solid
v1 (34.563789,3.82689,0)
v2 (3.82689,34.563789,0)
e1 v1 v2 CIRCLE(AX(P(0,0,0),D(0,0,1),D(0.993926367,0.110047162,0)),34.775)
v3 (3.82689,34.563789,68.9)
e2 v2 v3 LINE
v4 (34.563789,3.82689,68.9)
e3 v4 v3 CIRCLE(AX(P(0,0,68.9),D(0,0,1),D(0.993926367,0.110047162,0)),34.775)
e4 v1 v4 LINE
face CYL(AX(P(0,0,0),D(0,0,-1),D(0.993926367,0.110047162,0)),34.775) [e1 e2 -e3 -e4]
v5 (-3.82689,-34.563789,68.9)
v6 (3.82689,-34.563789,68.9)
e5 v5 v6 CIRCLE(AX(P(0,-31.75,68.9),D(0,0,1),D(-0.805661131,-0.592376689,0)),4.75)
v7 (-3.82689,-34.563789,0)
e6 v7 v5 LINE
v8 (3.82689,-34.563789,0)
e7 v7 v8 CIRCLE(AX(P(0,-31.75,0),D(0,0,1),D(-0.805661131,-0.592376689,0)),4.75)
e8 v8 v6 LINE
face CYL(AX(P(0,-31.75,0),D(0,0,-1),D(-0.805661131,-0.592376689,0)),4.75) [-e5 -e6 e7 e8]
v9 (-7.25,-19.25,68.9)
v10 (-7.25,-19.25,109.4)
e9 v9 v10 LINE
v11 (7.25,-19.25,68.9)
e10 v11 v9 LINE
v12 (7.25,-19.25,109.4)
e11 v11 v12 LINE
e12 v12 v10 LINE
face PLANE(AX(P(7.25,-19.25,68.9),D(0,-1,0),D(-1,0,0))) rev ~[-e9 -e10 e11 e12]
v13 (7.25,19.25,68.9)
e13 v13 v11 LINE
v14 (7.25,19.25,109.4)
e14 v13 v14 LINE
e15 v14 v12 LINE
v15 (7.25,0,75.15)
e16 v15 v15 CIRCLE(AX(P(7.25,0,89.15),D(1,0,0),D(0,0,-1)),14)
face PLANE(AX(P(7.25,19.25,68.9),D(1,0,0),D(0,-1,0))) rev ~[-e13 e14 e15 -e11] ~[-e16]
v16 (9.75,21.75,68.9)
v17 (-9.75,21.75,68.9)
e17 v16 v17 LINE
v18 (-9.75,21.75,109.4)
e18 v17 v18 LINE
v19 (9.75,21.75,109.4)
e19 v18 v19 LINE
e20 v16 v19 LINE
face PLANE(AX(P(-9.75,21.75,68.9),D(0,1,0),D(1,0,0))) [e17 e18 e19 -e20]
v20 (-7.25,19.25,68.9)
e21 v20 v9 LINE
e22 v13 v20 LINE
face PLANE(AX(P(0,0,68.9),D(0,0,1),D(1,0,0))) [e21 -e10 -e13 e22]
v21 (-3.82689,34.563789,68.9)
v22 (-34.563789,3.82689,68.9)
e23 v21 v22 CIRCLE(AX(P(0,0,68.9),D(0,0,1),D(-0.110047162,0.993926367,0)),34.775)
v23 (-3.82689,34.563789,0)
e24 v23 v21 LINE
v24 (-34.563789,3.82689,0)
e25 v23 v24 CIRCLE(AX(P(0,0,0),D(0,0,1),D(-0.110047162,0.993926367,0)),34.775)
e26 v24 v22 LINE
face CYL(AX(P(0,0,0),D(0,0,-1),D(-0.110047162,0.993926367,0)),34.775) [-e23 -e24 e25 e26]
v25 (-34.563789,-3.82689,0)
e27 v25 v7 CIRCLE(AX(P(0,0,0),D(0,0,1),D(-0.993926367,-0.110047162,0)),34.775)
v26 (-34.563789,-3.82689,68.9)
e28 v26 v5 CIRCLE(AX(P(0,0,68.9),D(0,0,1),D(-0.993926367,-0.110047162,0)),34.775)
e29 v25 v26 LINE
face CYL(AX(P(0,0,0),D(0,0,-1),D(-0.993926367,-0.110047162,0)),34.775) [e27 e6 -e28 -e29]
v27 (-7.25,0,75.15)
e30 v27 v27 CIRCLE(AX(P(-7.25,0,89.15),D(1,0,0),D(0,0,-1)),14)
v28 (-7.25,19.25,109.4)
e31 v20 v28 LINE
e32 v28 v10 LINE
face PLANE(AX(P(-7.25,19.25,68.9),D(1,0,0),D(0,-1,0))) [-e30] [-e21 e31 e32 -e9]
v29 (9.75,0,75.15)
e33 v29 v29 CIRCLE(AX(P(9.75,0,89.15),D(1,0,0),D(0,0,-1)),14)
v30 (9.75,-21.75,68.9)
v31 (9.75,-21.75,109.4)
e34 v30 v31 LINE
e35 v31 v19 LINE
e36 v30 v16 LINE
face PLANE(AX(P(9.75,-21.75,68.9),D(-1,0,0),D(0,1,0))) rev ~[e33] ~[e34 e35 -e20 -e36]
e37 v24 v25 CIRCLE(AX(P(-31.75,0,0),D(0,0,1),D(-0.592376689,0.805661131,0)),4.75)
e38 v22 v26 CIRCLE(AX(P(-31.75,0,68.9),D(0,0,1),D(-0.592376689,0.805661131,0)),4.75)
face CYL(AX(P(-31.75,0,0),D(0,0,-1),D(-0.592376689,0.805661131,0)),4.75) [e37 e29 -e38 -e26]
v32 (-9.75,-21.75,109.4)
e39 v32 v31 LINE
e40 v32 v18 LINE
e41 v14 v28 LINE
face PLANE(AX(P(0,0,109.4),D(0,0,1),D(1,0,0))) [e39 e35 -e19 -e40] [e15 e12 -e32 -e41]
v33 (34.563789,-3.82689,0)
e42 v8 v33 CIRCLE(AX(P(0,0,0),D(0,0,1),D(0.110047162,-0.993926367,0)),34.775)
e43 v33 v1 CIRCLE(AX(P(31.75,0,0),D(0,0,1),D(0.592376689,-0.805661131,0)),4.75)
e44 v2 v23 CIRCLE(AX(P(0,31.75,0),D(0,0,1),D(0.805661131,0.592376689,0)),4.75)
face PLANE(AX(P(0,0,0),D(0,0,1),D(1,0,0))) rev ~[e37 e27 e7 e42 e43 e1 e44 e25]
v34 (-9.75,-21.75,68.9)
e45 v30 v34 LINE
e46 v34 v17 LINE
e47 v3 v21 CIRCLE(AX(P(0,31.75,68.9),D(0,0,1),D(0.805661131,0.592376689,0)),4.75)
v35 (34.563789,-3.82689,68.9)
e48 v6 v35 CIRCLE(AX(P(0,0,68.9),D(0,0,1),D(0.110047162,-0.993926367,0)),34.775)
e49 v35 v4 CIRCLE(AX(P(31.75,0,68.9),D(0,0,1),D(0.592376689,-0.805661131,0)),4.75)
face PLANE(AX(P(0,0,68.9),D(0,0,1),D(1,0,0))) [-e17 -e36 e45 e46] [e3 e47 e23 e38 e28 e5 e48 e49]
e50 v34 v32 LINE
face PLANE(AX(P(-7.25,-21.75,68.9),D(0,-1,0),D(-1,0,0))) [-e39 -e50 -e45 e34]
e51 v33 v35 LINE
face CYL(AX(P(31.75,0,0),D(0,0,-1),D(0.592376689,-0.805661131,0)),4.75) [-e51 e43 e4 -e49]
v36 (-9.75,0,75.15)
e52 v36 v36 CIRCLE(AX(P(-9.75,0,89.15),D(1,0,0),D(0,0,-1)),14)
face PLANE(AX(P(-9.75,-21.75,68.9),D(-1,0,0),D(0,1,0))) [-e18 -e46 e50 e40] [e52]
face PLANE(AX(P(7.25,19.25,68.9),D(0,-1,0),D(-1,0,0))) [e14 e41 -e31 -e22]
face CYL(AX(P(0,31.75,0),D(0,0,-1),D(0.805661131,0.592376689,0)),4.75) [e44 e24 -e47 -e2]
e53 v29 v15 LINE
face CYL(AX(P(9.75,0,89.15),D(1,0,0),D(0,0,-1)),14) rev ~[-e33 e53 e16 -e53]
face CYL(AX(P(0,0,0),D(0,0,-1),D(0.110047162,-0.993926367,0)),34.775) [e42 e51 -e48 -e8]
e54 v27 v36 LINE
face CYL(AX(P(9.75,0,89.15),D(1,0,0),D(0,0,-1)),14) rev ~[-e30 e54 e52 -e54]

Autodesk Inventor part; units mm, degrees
ref_plane "YZ Plane" through (0, 0, 0) normal (1, 0, 0) x (0, 1, 0)
ref_plane "XZ Plane" through (0, 0, 0) normal (0, 1, 0) x (-1, 0, 0)
ref_plane "XY Plane" through (0, 0, 0) normal (0, 0, 1) x (1, 0, 0)
sketch "Sketch1" plane through (0, 0, 0) normal (0, 0, 1) x (1, 0, 0)
  circle A0 centre (0, 0) radius 11.25
  circle A1 centre (0, 0) radius 35.025
  circle A2 centre (0, 0) radius 37.030393
  arc A3 (-32.79294, -17.200962) -> (-31.29294, -19.799038) centre (0, 0) ccw
  line L0 (-32.79294, -17.200962) -> (-31.05471, -16.197395)
  line L1 (-32.79294, -17.200962) -> (-31.05471, -16.197395)
  line L2 (-29.55471, -18.795471) -> (-31.29294, -19.799038)
  line L3 (-31.29294, -19.799038) -> (-29.55471, -18.795471)
  line L4 (-16.197395, -31.05471) -> (-17.200962, -32.79294)
  line L5 (-17.200962, -32.79294) -> (-16.197395, -31.05471)
  arc A4 (-19.799038, -31.29294) -> (-17.200962, -32.79294) centre (0, 0) ccw
  line L6 (-19.799038, -31.29294) -> (-18.795471, -29.55471)
  line L7 (-19.799038, -31.29294) -> (-18.795471, -29.55471)
  arc A5 (17.200962, -32.79294) -> (19.799038, -31.29294) centre (0, 0) ccw
  line L8 (17.200962, -32.79294) -> (16.197395, -31.05471)
  line L9 (17.200962, -32.79294) -> (16.197395, -31.05471)
  line L10 (18.795471, -29.55471) -> (19.799038, -31.29294)
  line L11 (19.799038, -31.29294) -> (18.795471, -29.55471)
  arc A6 (31.29294, -19.799038) -> (32.79294, -17.200962) centre (0, 0) ccw
  line L12 (31.29294, -19.799038) -> (29.55471, -18.795471)
  line L13 (31.05471, -16.197395) -> (32.79294, -17.200962)
  line L14 (32.79294, -17.200962) -> (31.05471, -16.197395)
  line L15 (32.79294, 17.200962) -> (31.05471, 16.197395)
  line L16 (32.79294, 17.200962) -> (31.05471, 16.197395)
  arc A7 (32.79294, 17.200962) -> (31.29294, 19.799038) centre (0, 0) ccw
  line L17 (29.55471, 18.795471) -> (31.29294, 19.799038)
  line L18 (31.29294, 19.799038) -> (29.55471, 18.795471)
  line L19 (16.197395, 31.05471) -> (17.200962, 32.79294)
  line L20 (17.200962, 32.79294) -> (16.197395, 31.05471)
  line L21 (19.799038, 31.29294) -> (18.795471, 29.55471)
  line L22 (19.799038, 31.29294) -> (18.795471, 29.55471)
  line L23 (-17.200962, 32.79294) -> (-16.197395, 31.05471)
  line L24 (-17.200962, 32.79294) -> (-16.197395, 31.05471)
  line L25 (-18.795471, 29.55471) -> (-19.799038, 31.29294)
  line L26 (-19.799038, 31.29294) -> (-18.795471, 29.55471)
  arc A8 (-31.29294, 19.799038) -> (-32.79294, 17.200962) centre (0, 0) ccw
  line L27 (-31.29294, 19.799038) -> (-29.55471, 18.795471)
  line L28 (-31.29294, 19.799038) -> (-29.55471, 18.795471)
  line L29 (-31.05471, 16.197395) -> (-32.79294, 17.200962)
  line L30 (-32.79294, 17.200962) -> (-31.05471, 16.197395)
  arc A9 (-34.800207, -3.961848) -> (-34.800207, 3.961848) centre (-31.75, 0) ccw
  circle A10 centre (-31.75, 0) radius 5
  arc A11 (-3.961848, 34.800207) -> (3.961848, 34.800207) centre (0, 31.75) ccw
  circle A12 centre (0, 31.75) radius 5
  circle A13 centre (31.75, 0) radius 5
  circle A14 centre (31.75, 0) radius 5
  arc A15 (-3.961848, -34.800207) -> (3.961848, -34.800207) centre (0, -31.75) ccw
  circle A16 centre (0, -31.75) radius 5
  circle A17 centre (0, 31.75) radius 4.75
  circle A18 centre (-31.75, 0) radius 4.75
  circle A19 centre (0, -31.75) radius 4.75
  circle A20 centre (31.75, 0) radius 4.75
  circle A21 centre (0, 0) radius 34.775
  circle A22 centre (0, 0) radius 36.75
  point P0 (0, 0)
  point P1 (0, 49.75)
  point P2 (34.563789, -3.82689)
  point P3 (34.563789, 3.82689)
  point P4 (3.82689, 34.563789)
  point P5 (-3.82689, 34.563789)
  point P6 (-34.563789, 3.82689)
  point P7 (-34.563789, -3.82689)
  point P8 (-3.82689, -34.563789)
  point P9 (3.82689, -34.563789)
  dimension "d6" = 70.05
  dimension "d8" = 74.06079
  dimension "d0" = 10
  dimension "d1" = 0.25
  dimension "d4" = 360
  dimension "d7" = 0.25
  dimension "d9" = 73.5
sketch "Sketch1 outline for Extrusion1" plane through (0, 0, 0) normal (0, 0, 1) x (1, 0, 0)
  arc A0 (3.82689, -34.563789) -> (34.563789, -3.82689) centre (0, 0) ccw
  arc A1 (-3.82689, -34.563789) -> (3.82689, -34.563789) centre (0, -31.75) ccw
  arc A2 (-34.563789, -3.82689) -> (-3.82689, -34.563789) centre (0, 0) ccw
  arc A3 (-34.563789, 3.82689) -> (-34.563789, -3.82689) centre (-31.75, 0) ccw
  arc A4 (-3.82689, 34.563789) -> (-34.563789, 3.82689) centre (0, 0) ccw
  arc A5 (3.82689, 34.563789) -> (-3.82689, 34.563789) centre (0, 31.75) ccw
  arc A6 (34.563789, 3.82689) -> (3.82689, 34.563789) centre (0, 0) ccw
  arc A7 (34.563789, -3.82689) -> (34.563789, 3.82689) centre (31.75, 0) ccw
extrude "Extrusion1" add sketch "Sketch1 outline for Extrusion1" along normal blind 68.9
sketch "Skizze4" plane through (0, 0, 68.9) normal (0, 0, 1) x (1, 0, 0)
  line L0 (-9.75, 21.75) -> (9.75, 21.75) construction
  line L1 (9.75, 21.75) -> (9.75, -21.75) construction
  line L2 (9.75, -21.75) -> (-9.75, -21.75) construction
  line L3 (-9.75, -21.75) -> (-9.75, 21.75) construction
  line L4 (-9.75, 21.75) -> (9.75, -21.75) construction
  line L5 (9.75, 21.75) -> (-9.75, -21.75) construction
  line L6 (-9.75, 21.75) -> (-7.25, 21.75)
  line L7 (-7.25, 21.75) -> (-7.25, -21.75)
  line L8 (-7.25, -21.75) -> (-9.75, -21.75)
  line L9 (-9.75, -21.75) -> (-9.75, 21.75)
  line L10 (9.75, 21.75) -> (7.25, 21.75)
  line L11 (7.25, 21.75) -> (7.25, -21.75)
  line L12 (7.25, -21.75) -> (9.75, -21.75)
  line L13 (9.75, -21.75) -> (9.75, 21.75)
  line L14 (-7.25, -21.75) -> (8.25, -21.75)
  line L15 (8.25, -21.75) -> (8.25, -19.25)
  line L16 (8.25, -19.25) -> (-7.25, -19.25)
  line L17 (-7.25, -19.25) -> (-7.25, -21.75)
  line L18 (-7.25, 21.75) -> (8.25, 21.75)
  line L19 (8.25, 21.75) -> (8.25, 19.25)
  line L20 (8.25, 19.25) -> (-7.25, 19.25)
  line L21 (-7.25, 19.25) -> (-7.25, 21.75)
  point P0 (0, 0)
  point P1 (7.25, 19.25)
  point P2 (7.25, -19.25)
  dimension "d24" = 19.5
  dimension "d25" = 43.5
  dimension "d26" = 2.5
  dimension "d27" = 2.5
  dimension "d28" = 15.5
  dimension "d29" = 2.5
  dimension "d30" = 15.5
  dimension "d31" = 2.5
extrude "Extrusion4" add sketch "Skizze4" along normal blind 40.5 contours L6 L7 L8 L9 | L18 L11 L20 L7 | L10 L19 L20 L11 | L7 L16 L11 L14 | L20 L19 L10 L13 L12 L15 L16 L11 | L11 L16 L15 L12
sketch "Skizze5" plane through (9.75, -21.75, 68.9) normal (1, 0, 0) x (0, 0, -1)
  line L0 (-40.5, 43.5) -> (-40.5, 0) construction
  line L1 (0, 0) -> (-40.5, 0) construction
  line L2 (-40.5, 43.5) -> (0, 0) construction
  line L3 (0, 43.5) -> (-40.5, 43.5) construction
  line L4 (0, 43.5) -> (-40.5, 0) construction
  circle A0 centre (-20.25, 21.75) radius 14
  point P0 (68.9, 21.75)
  dimension "d35" = 28
extrude "Extrusion5" cut sketch "Skizze5" against normal through all
properties part number "power_sensor_aperture_V1.1"
